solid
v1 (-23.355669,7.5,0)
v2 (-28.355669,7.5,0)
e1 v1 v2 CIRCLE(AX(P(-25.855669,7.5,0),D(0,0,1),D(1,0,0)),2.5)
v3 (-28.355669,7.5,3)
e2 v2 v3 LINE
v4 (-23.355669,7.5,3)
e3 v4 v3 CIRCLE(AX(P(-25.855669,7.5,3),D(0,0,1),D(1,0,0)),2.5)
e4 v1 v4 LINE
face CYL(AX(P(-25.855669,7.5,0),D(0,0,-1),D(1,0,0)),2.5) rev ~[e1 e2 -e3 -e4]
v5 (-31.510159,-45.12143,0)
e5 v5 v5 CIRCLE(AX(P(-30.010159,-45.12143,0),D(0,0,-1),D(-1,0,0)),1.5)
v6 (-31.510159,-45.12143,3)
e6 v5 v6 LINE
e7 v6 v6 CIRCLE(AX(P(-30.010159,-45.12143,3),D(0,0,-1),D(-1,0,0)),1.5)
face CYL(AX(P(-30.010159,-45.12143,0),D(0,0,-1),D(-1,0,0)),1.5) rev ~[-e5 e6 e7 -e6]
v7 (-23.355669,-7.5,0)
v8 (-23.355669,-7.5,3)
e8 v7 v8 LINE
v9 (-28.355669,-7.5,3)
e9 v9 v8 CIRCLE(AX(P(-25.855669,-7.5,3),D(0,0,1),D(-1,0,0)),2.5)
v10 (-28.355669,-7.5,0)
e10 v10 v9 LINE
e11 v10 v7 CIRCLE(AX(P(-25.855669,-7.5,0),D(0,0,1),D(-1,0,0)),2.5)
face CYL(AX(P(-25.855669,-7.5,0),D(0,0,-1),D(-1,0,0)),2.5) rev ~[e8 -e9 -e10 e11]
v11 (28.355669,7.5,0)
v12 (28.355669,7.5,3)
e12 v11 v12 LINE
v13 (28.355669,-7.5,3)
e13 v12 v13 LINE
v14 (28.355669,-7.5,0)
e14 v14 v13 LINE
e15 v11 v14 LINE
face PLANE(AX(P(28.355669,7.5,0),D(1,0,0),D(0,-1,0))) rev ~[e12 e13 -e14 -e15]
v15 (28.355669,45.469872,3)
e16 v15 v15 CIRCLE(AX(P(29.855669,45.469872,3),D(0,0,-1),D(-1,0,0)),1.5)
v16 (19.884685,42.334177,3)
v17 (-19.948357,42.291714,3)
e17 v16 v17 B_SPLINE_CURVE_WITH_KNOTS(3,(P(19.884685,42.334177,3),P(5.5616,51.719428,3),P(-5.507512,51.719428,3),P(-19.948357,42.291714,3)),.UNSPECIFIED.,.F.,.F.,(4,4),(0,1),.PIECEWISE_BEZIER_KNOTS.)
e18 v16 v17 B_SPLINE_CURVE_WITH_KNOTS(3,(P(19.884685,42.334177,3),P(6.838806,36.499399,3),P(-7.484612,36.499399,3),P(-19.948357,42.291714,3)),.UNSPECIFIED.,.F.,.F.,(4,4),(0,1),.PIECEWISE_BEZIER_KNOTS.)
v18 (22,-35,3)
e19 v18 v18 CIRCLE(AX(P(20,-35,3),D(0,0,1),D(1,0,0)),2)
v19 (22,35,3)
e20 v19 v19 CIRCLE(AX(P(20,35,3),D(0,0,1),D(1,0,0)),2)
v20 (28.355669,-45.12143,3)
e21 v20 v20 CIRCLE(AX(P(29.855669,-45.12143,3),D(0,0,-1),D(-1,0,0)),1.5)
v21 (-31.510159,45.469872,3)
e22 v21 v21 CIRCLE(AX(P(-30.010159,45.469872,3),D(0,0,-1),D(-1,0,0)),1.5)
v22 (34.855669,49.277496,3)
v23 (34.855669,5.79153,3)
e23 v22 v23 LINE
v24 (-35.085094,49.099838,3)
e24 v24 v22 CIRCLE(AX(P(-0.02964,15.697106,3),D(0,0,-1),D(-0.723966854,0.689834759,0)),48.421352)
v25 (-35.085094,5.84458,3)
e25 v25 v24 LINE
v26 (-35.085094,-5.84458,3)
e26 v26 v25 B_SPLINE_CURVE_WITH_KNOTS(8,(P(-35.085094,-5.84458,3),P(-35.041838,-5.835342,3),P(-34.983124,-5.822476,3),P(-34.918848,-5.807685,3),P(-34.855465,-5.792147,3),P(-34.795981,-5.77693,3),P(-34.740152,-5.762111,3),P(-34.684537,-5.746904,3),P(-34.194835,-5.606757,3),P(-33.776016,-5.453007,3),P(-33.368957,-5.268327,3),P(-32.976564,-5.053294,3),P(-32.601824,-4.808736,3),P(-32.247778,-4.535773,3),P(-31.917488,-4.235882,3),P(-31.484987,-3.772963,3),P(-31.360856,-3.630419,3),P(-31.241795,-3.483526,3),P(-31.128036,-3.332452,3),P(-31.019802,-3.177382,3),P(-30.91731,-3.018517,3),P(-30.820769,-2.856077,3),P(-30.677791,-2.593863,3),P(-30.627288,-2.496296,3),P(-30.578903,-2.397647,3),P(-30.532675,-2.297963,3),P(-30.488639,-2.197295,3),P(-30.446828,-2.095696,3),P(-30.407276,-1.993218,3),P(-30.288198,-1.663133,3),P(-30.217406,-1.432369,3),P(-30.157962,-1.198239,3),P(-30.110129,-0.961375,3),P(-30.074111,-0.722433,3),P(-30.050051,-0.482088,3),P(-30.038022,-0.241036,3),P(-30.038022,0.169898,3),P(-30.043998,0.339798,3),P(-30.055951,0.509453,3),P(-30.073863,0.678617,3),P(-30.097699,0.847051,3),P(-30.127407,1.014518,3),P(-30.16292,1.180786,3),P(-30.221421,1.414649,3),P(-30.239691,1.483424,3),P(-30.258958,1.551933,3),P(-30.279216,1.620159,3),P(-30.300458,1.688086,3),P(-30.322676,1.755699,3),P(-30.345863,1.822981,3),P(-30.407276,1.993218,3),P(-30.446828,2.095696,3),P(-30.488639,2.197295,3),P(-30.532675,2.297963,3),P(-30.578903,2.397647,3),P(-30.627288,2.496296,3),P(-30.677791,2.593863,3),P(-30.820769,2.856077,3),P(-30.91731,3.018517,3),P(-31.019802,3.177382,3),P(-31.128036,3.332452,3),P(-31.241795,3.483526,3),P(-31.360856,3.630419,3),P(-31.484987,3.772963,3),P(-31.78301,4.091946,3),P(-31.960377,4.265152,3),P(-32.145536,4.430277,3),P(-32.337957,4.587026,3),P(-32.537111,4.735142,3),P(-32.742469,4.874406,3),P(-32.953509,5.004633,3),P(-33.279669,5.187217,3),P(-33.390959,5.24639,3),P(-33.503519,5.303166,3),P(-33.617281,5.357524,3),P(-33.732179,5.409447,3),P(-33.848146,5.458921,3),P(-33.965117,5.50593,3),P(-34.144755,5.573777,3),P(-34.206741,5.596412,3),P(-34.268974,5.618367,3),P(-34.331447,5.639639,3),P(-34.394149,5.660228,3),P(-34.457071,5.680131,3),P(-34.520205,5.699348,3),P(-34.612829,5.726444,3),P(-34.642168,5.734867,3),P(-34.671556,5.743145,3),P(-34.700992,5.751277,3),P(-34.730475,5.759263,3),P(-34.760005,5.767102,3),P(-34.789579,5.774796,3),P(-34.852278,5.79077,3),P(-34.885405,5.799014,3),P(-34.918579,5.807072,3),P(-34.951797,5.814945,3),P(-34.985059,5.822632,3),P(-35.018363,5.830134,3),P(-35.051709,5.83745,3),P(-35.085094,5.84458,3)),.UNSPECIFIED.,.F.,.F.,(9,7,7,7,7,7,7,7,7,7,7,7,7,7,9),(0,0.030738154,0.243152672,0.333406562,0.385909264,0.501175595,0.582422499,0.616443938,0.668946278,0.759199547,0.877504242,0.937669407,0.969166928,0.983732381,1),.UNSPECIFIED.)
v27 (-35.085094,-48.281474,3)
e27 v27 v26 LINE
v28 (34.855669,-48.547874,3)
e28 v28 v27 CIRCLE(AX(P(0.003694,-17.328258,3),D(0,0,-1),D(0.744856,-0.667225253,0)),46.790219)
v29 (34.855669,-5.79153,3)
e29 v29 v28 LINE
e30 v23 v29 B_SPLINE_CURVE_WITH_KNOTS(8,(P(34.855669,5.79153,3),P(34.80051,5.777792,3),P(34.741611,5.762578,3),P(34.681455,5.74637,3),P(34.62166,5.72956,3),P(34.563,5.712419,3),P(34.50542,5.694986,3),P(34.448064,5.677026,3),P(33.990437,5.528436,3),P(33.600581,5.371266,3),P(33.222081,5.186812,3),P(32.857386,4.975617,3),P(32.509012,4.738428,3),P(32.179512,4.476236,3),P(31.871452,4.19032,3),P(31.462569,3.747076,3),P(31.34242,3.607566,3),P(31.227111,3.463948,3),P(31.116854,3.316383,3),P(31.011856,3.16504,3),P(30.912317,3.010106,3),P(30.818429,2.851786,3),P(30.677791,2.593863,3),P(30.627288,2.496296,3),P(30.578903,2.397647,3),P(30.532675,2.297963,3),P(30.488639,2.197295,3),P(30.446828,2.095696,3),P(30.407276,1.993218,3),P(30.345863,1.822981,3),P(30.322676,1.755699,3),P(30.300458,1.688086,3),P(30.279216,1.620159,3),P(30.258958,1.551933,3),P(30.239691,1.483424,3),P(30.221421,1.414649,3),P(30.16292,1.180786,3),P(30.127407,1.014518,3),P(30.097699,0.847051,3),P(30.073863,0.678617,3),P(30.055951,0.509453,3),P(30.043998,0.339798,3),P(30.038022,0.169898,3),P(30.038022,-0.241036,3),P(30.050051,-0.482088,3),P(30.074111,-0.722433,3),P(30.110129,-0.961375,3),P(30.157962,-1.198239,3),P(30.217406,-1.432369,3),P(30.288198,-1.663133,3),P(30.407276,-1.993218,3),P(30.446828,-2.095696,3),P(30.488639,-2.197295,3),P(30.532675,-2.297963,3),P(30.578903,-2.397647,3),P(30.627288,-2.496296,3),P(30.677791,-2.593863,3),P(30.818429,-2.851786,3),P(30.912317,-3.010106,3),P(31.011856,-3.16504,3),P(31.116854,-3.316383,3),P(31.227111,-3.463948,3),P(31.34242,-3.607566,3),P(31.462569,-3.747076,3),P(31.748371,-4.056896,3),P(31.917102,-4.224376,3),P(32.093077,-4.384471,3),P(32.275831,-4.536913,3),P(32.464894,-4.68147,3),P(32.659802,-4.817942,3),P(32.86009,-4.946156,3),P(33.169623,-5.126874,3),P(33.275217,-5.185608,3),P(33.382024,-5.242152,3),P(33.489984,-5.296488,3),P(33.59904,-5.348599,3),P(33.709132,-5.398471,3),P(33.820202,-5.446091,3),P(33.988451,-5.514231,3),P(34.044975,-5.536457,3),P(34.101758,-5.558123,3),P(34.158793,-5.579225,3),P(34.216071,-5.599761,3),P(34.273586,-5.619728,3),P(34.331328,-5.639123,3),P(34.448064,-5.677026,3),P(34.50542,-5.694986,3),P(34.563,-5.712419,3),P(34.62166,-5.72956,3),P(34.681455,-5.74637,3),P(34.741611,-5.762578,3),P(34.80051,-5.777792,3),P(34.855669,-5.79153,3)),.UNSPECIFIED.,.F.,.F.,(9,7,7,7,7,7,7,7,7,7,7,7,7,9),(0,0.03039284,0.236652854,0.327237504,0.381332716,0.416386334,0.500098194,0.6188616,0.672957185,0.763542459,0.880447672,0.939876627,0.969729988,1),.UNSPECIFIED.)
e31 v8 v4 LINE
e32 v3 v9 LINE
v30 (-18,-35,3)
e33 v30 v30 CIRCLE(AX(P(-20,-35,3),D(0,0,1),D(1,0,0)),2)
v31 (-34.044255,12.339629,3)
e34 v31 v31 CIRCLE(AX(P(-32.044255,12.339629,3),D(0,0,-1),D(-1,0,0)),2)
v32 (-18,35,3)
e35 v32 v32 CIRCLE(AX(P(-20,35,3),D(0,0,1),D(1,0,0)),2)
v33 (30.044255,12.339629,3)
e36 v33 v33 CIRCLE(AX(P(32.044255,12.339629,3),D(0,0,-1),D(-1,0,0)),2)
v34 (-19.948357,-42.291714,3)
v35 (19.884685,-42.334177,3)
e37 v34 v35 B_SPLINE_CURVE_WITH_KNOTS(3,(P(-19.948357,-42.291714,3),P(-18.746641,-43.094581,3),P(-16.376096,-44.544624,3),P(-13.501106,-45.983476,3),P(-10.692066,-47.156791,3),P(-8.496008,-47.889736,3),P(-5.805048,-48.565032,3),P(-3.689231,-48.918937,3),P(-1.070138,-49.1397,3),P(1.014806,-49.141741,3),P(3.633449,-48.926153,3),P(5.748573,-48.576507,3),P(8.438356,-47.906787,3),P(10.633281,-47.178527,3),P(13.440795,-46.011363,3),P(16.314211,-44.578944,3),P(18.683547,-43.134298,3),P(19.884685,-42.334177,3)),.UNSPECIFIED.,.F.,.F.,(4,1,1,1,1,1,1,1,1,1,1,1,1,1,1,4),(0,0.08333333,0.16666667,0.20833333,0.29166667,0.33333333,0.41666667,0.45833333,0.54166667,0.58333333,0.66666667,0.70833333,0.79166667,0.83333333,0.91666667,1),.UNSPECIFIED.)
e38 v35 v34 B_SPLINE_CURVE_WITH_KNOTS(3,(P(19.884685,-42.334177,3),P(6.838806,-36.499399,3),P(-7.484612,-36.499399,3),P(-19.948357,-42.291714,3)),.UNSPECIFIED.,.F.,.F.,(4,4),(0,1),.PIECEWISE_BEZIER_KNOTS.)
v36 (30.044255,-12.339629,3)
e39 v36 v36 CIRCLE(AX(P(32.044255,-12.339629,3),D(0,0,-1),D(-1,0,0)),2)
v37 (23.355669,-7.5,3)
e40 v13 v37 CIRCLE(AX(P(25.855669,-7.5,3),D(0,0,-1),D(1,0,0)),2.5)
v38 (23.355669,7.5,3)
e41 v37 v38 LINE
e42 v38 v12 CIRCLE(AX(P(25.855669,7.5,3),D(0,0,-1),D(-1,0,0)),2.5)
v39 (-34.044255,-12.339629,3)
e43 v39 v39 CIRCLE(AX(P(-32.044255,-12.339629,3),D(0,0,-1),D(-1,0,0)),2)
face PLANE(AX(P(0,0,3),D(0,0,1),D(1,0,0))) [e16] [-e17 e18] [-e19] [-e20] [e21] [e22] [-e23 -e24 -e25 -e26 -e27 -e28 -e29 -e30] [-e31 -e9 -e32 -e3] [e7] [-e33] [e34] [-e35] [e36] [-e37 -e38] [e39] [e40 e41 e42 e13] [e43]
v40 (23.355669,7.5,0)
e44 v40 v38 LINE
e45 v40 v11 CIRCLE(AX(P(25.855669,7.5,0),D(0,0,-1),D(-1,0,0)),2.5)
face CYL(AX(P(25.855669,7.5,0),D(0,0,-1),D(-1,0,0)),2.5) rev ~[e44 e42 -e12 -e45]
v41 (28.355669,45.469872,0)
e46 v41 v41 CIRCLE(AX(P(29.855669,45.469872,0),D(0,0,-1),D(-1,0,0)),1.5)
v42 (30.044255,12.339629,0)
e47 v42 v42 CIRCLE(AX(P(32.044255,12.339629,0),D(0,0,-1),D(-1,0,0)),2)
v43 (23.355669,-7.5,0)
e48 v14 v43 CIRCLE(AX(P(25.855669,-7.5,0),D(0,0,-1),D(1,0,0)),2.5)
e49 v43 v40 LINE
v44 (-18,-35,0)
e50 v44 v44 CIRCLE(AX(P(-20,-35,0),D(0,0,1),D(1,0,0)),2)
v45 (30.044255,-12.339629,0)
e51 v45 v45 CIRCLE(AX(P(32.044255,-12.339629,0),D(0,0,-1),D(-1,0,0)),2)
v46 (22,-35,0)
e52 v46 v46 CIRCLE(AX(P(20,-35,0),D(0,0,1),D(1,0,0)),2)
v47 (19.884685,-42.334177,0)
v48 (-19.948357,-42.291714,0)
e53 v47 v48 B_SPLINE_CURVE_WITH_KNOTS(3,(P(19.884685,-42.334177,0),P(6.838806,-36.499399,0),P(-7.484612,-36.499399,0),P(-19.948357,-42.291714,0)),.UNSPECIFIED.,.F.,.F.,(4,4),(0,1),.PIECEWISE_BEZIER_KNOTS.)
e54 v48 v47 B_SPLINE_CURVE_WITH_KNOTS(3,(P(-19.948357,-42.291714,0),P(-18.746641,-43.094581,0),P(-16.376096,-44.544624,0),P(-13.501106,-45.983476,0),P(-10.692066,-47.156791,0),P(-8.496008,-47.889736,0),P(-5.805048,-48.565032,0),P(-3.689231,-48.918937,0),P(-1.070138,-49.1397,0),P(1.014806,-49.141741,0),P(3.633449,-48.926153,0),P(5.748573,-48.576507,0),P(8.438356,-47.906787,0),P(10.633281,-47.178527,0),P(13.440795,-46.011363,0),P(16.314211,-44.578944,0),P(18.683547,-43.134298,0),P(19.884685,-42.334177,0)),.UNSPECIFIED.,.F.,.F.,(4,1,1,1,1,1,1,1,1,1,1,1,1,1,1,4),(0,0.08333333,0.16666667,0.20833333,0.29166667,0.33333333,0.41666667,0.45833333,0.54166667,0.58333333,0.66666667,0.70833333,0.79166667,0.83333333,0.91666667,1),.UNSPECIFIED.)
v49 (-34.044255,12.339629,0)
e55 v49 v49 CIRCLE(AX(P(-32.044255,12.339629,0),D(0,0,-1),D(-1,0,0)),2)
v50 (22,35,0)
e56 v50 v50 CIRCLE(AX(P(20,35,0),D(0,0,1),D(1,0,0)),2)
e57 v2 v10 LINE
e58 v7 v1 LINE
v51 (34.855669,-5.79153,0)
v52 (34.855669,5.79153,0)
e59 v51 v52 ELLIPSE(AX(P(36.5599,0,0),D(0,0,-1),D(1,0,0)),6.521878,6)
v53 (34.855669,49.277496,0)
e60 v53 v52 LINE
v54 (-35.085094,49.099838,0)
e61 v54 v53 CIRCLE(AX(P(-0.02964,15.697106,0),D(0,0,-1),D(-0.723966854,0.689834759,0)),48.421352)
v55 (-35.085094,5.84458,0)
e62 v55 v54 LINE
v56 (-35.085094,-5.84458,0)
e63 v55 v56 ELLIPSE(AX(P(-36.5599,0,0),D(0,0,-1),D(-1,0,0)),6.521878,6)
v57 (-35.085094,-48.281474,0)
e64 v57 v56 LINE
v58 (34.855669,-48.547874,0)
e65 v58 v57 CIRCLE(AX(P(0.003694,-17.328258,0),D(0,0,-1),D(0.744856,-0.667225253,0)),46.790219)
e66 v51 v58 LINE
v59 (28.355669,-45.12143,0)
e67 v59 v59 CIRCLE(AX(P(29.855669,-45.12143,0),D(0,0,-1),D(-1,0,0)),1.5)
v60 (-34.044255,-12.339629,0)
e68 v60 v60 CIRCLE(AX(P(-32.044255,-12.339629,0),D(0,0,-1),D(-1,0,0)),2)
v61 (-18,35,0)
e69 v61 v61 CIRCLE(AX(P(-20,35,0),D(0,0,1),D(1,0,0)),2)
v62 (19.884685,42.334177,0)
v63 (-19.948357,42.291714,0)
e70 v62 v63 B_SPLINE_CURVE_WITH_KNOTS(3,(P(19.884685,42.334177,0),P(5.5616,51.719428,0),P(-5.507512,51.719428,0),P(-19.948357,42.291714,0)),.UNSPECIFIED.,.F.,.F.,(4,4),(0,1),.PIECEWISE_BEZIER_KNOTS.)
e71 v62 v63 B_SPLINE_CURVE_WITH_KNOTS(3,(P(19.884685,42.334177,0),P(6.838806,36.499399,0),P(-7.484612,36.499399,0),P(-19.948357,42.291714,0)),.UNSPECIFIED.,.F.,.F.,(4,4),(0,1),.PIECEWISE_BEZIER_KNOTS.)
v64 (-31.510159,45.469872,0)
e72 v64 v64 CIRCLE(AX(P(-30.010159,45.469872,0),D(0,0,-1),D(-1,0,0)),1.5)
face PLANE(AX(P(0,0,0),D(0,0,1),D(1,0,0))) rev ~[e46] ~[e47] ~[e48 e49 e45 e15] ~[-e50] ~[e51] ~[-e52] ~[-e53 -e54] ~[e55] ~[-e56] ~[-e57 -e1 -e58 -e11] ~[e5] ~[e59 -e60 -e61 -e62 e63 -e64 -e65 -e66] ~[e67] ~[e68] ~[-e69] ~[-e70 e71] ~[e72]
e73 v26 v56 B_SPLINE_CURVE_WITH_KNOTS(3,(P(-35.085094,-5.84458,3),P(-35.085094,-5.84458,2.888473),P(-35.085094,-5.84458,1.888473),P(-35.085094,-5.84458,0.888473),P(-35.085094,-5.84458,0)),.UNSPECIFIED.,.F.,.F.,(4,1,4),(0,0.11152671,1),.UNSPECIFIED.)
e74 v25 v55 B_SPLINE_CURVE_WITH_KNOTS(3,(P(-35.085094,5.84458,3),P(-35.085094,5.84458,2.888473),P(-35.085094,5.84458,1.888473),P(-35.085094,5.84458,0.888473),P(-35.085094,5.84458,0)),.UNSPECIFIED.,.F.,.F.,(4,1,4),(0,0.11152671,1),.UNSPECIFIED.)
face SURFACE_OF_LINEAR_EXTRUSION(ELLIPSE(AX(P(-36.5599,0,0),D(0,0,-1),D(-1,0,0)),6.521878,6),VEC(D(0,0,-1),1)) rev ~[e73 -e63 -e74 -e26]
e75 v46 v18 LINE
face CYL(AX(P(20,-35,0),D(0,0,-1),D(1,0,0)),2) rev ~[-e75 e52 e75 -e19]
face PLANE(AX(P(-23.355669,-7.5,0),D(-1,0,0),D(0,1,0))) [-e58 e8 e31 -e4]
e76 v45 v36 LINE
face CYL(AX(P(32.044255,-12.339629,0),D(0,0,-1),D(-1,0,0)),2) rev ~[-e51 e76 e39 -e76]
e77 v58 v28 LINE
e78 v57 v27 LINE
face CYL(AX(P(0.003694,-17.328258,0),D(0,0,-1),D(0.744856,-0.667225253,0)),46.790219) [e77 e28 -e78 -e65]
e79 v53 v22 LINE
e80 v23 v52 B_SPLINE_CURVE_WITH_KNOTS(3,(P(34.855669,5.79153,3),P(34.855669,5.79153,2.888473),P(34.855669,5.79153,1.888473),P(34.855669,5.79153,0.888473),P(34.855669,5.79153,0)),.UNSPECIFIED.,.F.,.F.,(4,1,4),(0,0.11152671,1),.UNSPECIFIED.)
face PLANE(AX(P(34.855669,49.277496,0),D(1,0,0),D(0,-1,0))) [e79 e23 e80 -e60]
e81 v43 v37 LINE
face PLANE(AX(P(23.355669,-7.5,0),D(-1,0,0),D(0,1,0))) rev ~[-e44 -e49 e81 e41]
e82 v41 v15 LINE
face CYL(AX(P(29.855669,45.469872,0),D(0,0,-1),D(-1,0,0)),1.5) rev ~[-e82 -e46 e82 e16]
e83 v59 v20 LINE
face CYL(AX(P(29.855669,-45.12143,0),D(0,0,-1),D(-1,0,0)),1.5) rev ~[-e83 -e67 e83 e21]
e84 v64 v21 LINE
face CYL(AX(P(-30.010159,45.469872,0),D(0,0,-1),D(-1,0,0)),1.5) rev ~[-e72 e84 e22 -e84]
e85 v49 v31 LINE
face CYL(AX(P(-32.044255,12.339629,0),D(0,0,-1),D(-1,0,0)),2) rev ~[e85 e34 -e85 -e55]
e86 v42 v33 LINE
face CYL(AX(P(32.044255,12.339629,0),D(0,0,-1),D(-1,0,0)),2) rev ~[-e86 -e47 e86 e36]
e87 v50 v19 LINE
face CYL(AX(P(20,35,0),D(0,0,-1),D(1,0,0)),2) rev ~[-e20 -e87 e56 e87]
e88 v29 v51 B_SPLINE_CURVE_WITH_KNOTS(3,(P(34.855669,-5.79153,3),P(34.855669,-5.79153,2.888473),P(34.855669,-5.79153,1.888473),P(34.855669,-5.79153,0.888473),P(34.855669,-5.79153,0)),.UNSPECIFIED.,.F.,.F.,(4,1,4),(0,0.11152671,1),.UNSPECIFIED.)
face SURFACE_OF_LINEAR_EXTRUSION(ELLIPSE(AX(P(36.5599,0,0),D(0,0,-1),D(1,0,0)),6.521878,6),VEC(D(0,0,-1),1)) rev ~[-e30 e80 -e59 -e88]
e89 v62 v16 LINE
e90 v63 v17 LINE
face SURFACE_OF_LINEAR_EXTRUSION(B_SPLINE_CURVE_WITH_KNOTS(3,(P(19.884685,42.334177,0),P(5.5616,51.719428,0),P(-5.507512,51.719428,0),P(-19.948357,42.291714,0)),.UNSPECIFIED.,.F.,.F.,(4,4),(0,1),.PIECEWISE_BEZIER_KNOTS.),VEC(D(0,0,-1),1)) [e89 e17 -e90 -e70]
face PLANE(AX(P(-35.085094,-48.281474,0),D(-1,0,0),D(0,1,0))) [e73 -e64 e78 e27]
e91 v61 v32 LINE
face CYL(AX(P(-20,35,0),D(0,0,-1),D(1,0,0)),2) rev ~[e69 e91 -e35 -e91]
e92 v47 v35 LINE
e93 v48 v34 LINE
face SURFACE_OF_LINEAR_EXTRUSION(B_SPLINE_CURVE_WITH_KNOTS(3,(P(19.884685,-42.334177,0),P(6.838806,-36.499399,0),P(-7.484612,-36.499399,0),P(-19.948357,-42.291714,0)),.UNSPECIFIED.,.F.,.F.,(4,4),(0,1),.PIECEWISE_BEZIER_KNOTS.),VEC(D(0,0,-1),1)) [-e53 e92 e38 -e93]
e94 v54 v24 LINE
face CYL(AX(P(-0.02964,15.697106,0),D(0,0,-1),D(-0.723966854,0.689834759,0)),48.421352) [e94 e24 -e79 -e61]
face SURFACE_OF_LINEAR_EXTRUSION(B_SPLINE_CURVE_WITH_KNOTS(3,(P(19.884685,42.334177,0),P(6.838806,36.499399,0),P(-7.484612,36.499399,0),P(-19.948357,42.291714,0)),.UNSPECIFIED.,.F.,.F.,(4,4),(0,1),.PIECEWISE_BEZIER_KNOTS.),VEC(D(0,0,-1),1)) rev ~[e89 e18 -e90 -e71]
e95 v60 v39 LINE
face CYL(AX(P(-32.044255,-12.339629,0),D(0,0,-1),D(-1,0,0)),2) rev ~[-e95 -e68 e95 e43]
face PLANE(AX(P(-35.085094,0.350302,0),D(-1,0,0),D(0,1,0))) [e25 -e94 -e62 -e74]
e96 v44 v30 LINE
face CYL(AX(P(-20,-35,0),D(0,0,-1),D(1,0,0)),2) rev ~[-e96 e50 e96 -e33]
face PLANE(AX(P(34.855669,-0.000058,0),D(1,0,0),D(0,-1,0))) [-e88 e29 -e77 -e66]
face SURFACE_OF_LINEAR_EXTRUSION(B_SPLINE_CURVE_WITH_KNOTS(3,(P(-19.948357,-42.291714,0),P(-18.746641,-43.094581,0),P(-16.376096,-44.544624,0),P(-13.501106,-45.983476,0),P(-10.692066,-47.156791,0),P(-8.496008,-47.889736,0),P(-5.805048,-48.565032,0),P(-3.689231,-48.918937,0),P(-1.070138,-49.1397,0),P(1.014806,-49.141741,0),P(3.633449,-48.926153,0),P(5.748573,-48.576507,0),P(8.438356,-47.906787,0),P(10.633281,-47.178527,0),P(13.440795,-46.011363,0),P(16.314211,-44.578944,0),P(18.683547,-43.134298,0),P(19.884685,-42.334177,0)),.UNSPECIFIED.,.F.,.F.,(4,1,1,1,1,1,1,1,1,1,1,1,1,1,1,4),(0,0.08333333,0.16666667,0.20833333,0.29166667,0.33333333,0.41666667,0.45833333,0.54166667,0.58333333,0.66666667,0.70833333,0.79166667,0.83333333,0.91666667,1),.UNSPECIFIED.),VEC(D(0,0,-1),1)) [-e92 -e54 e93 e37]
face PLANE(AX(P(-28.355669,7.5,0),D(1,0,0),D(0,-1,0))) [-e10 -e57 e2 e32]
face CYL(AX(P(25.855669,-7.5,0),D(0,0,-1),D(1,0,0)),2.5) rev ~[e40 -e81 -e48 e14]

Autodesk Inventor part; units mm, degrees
ref_plane "YZ Plane" through (0, 0, 0) normal (1, 0, 0) x (0, 1, 0)
ref_plane "XZ Plane" through (0, 0, 0) normal (0, 1, 0) x (-1, 0, 0)
ref_plane "XY Plane" through (0, 0, 0) normal (0, 0, 1) x (1, 0, 0)
ref_plane "Płaszczyzna konstrukcyjna1" through (0, 0, 0) normal (0, 0, 1) x (1, 0, 0)
sketch "Szkic1" plane through (0, 0, 0) normal (0, 0, 1) x (1, 0, 0)
  line L0 (-16.5, -47.5) -> (-16.5, 50.5) construction
  line L1 (16.5, -47.5) -> (-16.5, -47.5)
  line L2 (16.5, 50.5) -> (16.5, -47.5) construction
  line L3 (-16.5, 50.5) -> (16.5, 50.5)
  spline S0 degree 3 poles (-35.085094, 0.350302) (-65.123445, -45.85666) (-107.677174, -89.186977) (-160.871239, -134.245964) (-163.540213, -136.506767) (-166.235706, -138.77176) (-168.958028, -141.042) knots 1.00684263 1.00684263 1.00684263 1.00684263 1.95254981 1.95254981 1.95254981 2 2 2 2 construction
  spline S1 degree 3 poles (-168.958035, -141.042006) (-174.842969, -145.949681) (-180.021392, -152.120463) (-183.430993, -158.400223) (-185.92467, -162.993046) (-187.5096, -167.629248) (-187.777285, -172.0593) (-187.941661, -174.779633) (-187.597345, -177.457906) (-186.533873, -179.887417) (-185.566044, -182.098431) (-183.960403, -184.06029) (-181.944828, -185.409391) (-179.841126, -186.817479) (-177.370046, -187.557326) (-174.842104, -187.757319) (-170.645821, -188.089298) (-166.2165, -187.039461) (-161.759498, -185.081578) (-154.903003, -182.06964) (-147.956172, -176.775816) (-142.375954, -170.505914) (-141.930799, -170.005741) (-141.494091, -169.499252) (-141.067481, -168.988346) knots -1.74995257 -1.74995257 -1.74995257 -1.74995257 -1.03595782 -1.03595782 -1.03595782 -0.51376401 -0.51376401 -0.51376401 -0.19310387 -0.19310387 -0.19310387 0.09871784 0.09871784 0.09871784 0.4032988 0.4032988 0.4032988 0.90889088 0.90889088 0.90889088 1.68667586 1.68667586 1.68667586 1.74872267 1.74872267 1.74872267 1.74872267
  spline S2 degree 3 poles (-141.067481, -168.988346) (-116.712468, -140.68912) (-93.293894, -114.867026) (-73.367362, -94.342192) (-61.6586, -82.28187) (-51.151132, -72.048223) (-42.412496, -64.246161) (-37.627468, -59.973975) (-33.366948, -56.428021) (-29.779492, -53.735847) knots 1.1712815 1.1712815 1.1712815 1.1712815 1.58557053 1.58557053 1.58557053 1.82900535 1.82900535 1.82900535 1.96230333 1.96230333 1.96230333 1.96230333
  spline S3 degree 3 poles (-29.779492, -53.735847) (-23.002213, -58.511561) (-16.053637, -61.720133) (-8.95639, -63.196051) (-1.235829, -64.801593) (6.619932, -64.303417) (14.26492, -61.76241) (19.532027, -60.011752) (24.701042, -57.314346) (29.778619, -53.736463) knots 1.04774904 1.04774904 1.04774904 1.04774904 1.36653444 1.36653444 1.36653444 1.71331713 1.71331713 1.71331713 1.95223726 1.95223726 1.95223726 1.95223726
  spline S4 degree 3 poles (29.778619, -53.736463) (34.571432, -57.320947) (40.566429, -62.365096) (47.432495, -68.614281) (65.987099, -85.501849) (90.98262, -111.228833) (117.881656, -141.881406) (125.48107, -150.541255) (133.234406, -159.595591) (141.042009, -168.957931) knots 1.23044004 1.23044004 1.23044004 1.23044004 1.40276207 1.40276207 1.40276207 1.86843878 1.86843878 1.86843878 2 2 2 2
  spline S5 degree 3 poles (141.042009, -168.957931) (145.94969, -174.842884) (152.120487, -180.021325) (158.400263, -183.430935) (162.993086, -185.924612) (167.629288, -187.509541) (172.05934, -187.777227) (174.779673, -187.941603) (177.457946, -187.597287) (179.887458, -186.533815) (182.098472, -185.565985) (184.06033, -183.960345) (185.409431, -181.94477) (186.817519, -179.841068) (187.557366, -177.369988) (187.757359, -174.842045) (188.089339, -170.645763) (187.039501, -166.216442) (185.081618, -161.75944) (182.069681, -154.902945) (176.775856, -147.956114) (170.505954, -142.375896) (169.995852, -141.921904) (169.479183, -141.4767) (168.957931, -141.042009) knots -1.7499544 -1.7499544 -1.7499544 -1.7499544 -1.03595782 -1.03595782 -1.03595782 -0.51376401 -0.51376401 -0.51376401 -0.19310387 -0.19310387 -0.19310387 0.09871784 0.09871784 0.09871784 0.4032988 0.4032988 0.4032988 0.90889088 0.90889088 0.90889088 1.68667586 1.68667586 1.68667586 1.7499544 1.7499544 1.7499544 1.7499544
  spline S6 degree 3 poles (168.957931, -141.042009) (111.993228, -93.537028) (66.637529, -48.185561) (34.855669, -0.000058) knots 1 1 1 1 1.99296801 1.99296801 1.99296801 1.99296801 construction
  spline S7 degree 3 poles (34.855669, -0.000058) (66.637377, 48.185408) (111.993133, 93.536948) (168.957931, 141.042009) knots 1.00703033 1.00703033 1.00703033 1.00703033 2 2 2 2 construction
  spline S8 degree 3 poles (168.957931, 141.042009) (174.842884, 145.94969) (180.021325, 152.120487) (183.430935, 158.400263) (185.924612, 162.993086) (187.509541, 167.629288) (187.777227, 172.05934) (187.941603, 174.779673) (187.597287, 177.457946) (186.533815, 179.887458) (185.565985, 182.098472) (183.960345, 184.06033) (181.94477, 185.409431) (179.841068, 186.817519) (177.369988, 187.557366) (174.842045, 187.757359) (170.645763, 188.089339) (166.216442, 187.039501) (161.75944, 185.081618) (154.902945, 182.069681) (147.956114, 176.775856) (142.375896, 170.505954) (141.93073, 170.005769) (141.494012, 169.499268) (141.067392, 168.98835) knots -1.7499544 -1.7499544 -1.7499544 -1.7499544 -1.03595782 -1.03595782 -1.03595782 -0.51376401 -0.51376401 -0.51376401 -0.19310387 -0.19310387 -0.19310387 0.09871784 0.09871784 0.09871784 0.4032988 0.4032988 0.4032988 0.90889088 0.90889088 0.90889088 1.68667586 1.68667586 1.68667586 1.74872416 1.74872416 1.74872416 1.74872416 construction
  spline S9 degree 3 poles (141.067392, 168.98835) (116.712447, 140.689096) (93.29391, 114.86699) (73.367396, 94.342151) (61.658634, 82.281814) (51.151162, 72.048159) (42.412523, 64.246094) (37.627506, 59.973916) (33.366993, 56.427969) (29.779541, 53.7358) knots 1.17128149 1.17128149 1.17128149 1.17128149 1.58557053 1.58557053 1.58557053 1.82900558 1.82900558 1.82900558 1.96230334 1.96230334 1.96230334 1.96230334 construction
  spline S10 degree 3 poles (29.779541, 53.7358) (23.00225, 58.511525) (16.053664, 61.720107) (8.956408, 63.196032) (1.235842, 64.80158) (-6.619923, 64.30341) (-14.264913, 61.762407) (-19.532023, 60.011751) (-24.70104, 57.314346) (-29.778619, 53.736463) knots 1.04774897 1.04774897 1.04774897 1.04774897 1.36653452 1.36653452 1.36653452 1.71331713 1.71331713 1.71331713 1.95223726 1.95223726 1.95223726 1.95223726
  spline S11 degree 3 poles (-29.778619, 53.736463) (-34.571432, 57.320947) (-40.566429, 62.365096) (-47.432495, 68.614281) (-65.987099, 85.501849) (-90.98262, 111.228833) (-117.881656, 141.881406) (-125.48107, 150.541255) (-133.234406, 159.595591) (-141.042009, 168.957931) knots 1.23044004 1.23044004 1.23044004 1.23044004 1.40276207 1.40276207 1.40276207 1.86843878 1.86843878 1.86843878 2 2 2 2 construction
  spline S12 degree 3 poles (-141.042009, 168.957931) (-145.94969, 174.842884) (-152.120487, 180.021325) (-158.400263, 183.430935) (-162.993086, 185.924612) (-167.629288, 187.509541) (-172.05934, 187.777227) (-174.779673, 187.941603) (-177.457946, 187.597287) (-179.887458, 186.533815) (-182.098472, 185.565985) (-184.06033, 183.960345) (-185.409431, 181.94477) (-186.817519, 179.841068) (-187.557366, 177.369988) (-187.757359, 174.842045) (-188.089339, 170.645763) (-187.039501, 166.216442) (-185.081618, 161.75944) (-182.069681, 154.902945) (-176.775856, 147.956114) (-170.505954, 142.375896) (-169.995852, 141.921904) (-169.479183, 141.4767) (-168.957931, 141.042009) knots -1.7499544 -1.7499544 -1.7499544 -1.7499544 -1.03595782 -1.03595782 -1.03595782 -0.51376401 -0.51376401 -0.51376401 -0.19310387 -0.19310387 -0.19310387 0.09871784 0.09871784 0.09871784 0.4032988 0.4032988 0.4032988 0.90889088 0.90889088 0.90889088 1.68667586 1.68667586 1.68667586 1.7499544 1.7499544 1.7499544 1.7499544
  spline S13 degree 3 poles (-168.957931, 141.042009) (-111.993306, 93.537093) (-66.634651, 48.181164) (-35.085094, 0.350302) knots 1 1 1 1 1.99296665 1.99296665 1.99296665 1.99296665 construction
  spline S14 degree 3 poles (15.08474, 32.081826) (13.142615, 27.920021) (11.206834, 23.755267) (7.347081, 15.418016) (5.423125, 11.245533) (3.50551, 7.070128) knots 0 0 0 0 1.37779618 1.37779618 2.75620579 2.75620579 2.75620579 2.75620579 construction
  arc A0 (3.50551, 7.070128) -> (-3.550162, 7.111441) centre (-0.064535, -0.117868) ccw
  spline S15 degree 3 poles (-3.550162, 7.111441) (-5.476159, 11.293082) (-7.408923, 15.471593) (-11.287085, 23.820373) (-13.232467, 27.990624) (-15.184617, 32.157717) knots 0 0 0 0 1.38115979 1.38115979 2.76166682 2.76166682 2.76166682 2.76166682 construction
  spline S16 degree 3 poles (-15.184617, 32.157717) (-14.754715, 32.524347) (-14.315487, 32.879522) (-13.401907, 33.58056) (-12.927392, 33.92514) (-12.444135, 34.257559) knots 0 0 0 0 0.49064646 0.49064646 1 1 1 1
  spline S17 degree 3 poles (-12.444135, 34.257559) (-9.857516, 31.263166) (-7.370332, 28.095019) (-3.226905, 21.915373) (-1.464317, 18.86972) (-0.029639, 15.697104) knots 0 0 0 0 1.18706736 1.18706736 2.2295227 2.2295227 2.2295227 2.2295227
  spline S18 degree 3 poles (-0.029639, 15.697104) (1.394779, 18.864276) (3.146428, 21.904712) (7.267313, 28.073431) (9.741557, 31.234617) (12.316482, 34.222704) knots 0 0 0 0 1.04182291 1.04182291 2.22753004 2.22753004 2.22753004 2.22753004
  spline S19 degree 3 poles (12.316482, 34.222704) (12.805198, 33.884055) (13.28481, 33.532857) (14.207654, 32.81808) (14.651041, 32.455846) (15.08474, 32.081826) knots 0 0 0 0 0.50937249 0.50937249 1 1 1 1
  spline S20 degree 3 poles (-19.948357, 42.291714) (-14.639949, 45.838264) (-9.990985, 47.660697) (-2.091787, 49.301941) (1.677222, 49.331262) (9.761575, 47.76592) (14.518581, 45.908732) (19.884685, 42.334177) knots 0 0 0 0 1.91524131 1.91524131 3.69438874 3.69438874 5.68840016 5.68840016 5.68840016 5.68840016 construction
  spline S21 degree 3 poles (19.884685, 42.334177) (13.583668, 39.654933) (6.996486, 38.105537) (-3.242366, 38.040322) (-6.597665, 38.388751) (-13.364764, 39.812974) (-16.709843, 40.903142) (-19.948357, 42.291714) knots 0 0 0 0 2.05409443 2.05409443 3.07151826 3.07151826 4.128565 4.128565 4.128565 4.128565
  circle A1 centre (-173.423564, 173.187828) radius 3
  circle A2 centre (173.294495, -173.423564) radius 3
  circle A3 centre (173.241161, 173.241161) radius 3
  circle A4 centre (-173.370231, -173.476898) radius 3
  spline S22 degree 3 poles (-19.066093, -42.869125) (-12.882074, -40.751924) (-6.517551, -39.59928) (6.547635, -39.59651) (12.903023, -40.74369) (19.078711, -42.861037) knots 0 0 0 0 1.96092247 1.96092247 3.91949067 3.91949067 3.91949067 3.91949067 construction
  spline S23 degree 3 poles (19.078711, -42.861037) (14.864666, -45.563042) (10.225957, -47.709734) (1.45827, -49.346262) (-2.32179, -49.284891) (-9.747617, -47.680221) (-14.038512, -46.090792) (-19.066093, -42.869125) knots 0 0 0 0 1.5017693 1.5017693 2.66720704 2.66720704 3.77054668 3.77054668 3.77054668 3.77054668
  spline S24 degree 3 poles (-14.516561, -32.673383) (-12.636802, -28.474571) (-10.750685, -24.278615) (-6.966619, -15.894413) (-5.068682, -11.706181) (-3.164387, -7.520833) knots 0 0 0 0 1.38011477 1.38011477 2.75957612 2.75957612 2.75957612 2.75957612 construction
  arc A5 (-3.164387, -7.520833) -> (3.168342, -7.463715) centre (-0.064535, -0.117868) ccw
  spline S25 degree 3 poles (3.168342, -7.463715) (5.085541, -11.667908) (6.995965, -15.875184) (10.800733, -24.290442) (12.69509, -28.498407) (14.582623, -32.709436) knots 0 0 0 0 1.38621048 1.38621048 2.77062343 2.77062343 2.77062343 2.77062343 construction
  spline S26 degree 3 poles (14.582623, -32.709436) (14.13991, -33.096217) (13.662069, -33.486083) (12.716313, -34.222379) (12.21496, -34.593642) (11.712763, -34.945387) knots 0 0 0 0 0.49185835 0.49185835 1 1 1 1
  spline S27 degree 3 poles (11.712763, -34.945387) (9.276978, -32.103289) (6.942538, -29.102251) (3.034739, -23.232824) (1.370156, -20.340004) (0.003694, -17.328259) knots 0 0 0 0 1.12292095 1.12292095 2.11343337 2.11343337 2.11343337 2.11343337 construction
  spline S28 degree 3 poles (0.003694, -17.328259) (-1.356274, -20.333171) (-3.013893, -23.219487) (-6.906842, -29.076217) (-9.233125, -32.070858) (-11.66075, -34.906916) knots 0 0 0 0 0.98950049 0.98950049 2.1113335 2.1113335 2.1113335 2.1113335
  spline S29 degree 3 poles (-11.66075, -34.906916) (-12.164863, -34.554062) (-12.659287, -34.188046) (-13.611319, -33.442296) (-14.069007, -33.063947) (-14.516561, -32.673383) knots 0 0 0 0 0.50881737 0.50881737 1 1 1 1
  line L4 (-35.085094, 0.350302) -> (-35.085094, 49.099838)
  line L5 (-35.085094, 0.350302) -> (-35.085094, -48.281474)
  line L6 (34.855669, -0.000058) -> (34.855669, -48.547874)
  line L7 (34.855669, -0.000058) -> (34.855669, 49.277496)
  arc A6 (34.855669, 49.277496) -> (-35.085094, 49.099838) centre (-0.029639, 15.697104) ccw
  arc A7 (-35.085094, -48.281474) -> (34.855669, -48.547874) centre (0.003694, -17.328259) ccw
  circle A8 centre (-20, -35) radius 2
  line L8 (-277.818739, 0) -> (277.818714, 0)
  line L9 (0, -277.778257) -> (0, 277.778257)
  circle A9 centre (20, -35) radius 2
  circle A10 centre (-20, 35) radius 2
  circle A11 centre (20, 35) radius 2
  arc A12 (28.355669, 7.5) -> (23.355669, 7.5) centre (25.855669, 7.5) ccw
  arc A13 (23.355669, -7.5) -> (28.355669, -7.5) centre (25.855669, -7.5) ccw
  line L10 (28.355669, -7.5) -> (28.355669, 7.5)
  line L11 (23.355669, 7.5) -> (23.355669, -7.5)
  arc A14 (-23.355669, 7.5) -> (-28.355669, 7.5) centre (-25.855669, 7.5) ccw
  arc A15 (-28.355669, -7.5) -> (-23.355669, -7.5) centre (-25.855669, -7.5) ccw
  line L12 (-28.355669, -7.5) -> (-28.355669, 7.5)
  line L13 (-23.355669, 7.5) -> (-23.355669, -7.5)
  line L14 (19.884685, 42.334177) -> (5.5616, 51.719428) construction
  line L15 (5.5616, 51.719428) -> (-5.507512, 51.719428) construction
  line L16 (-5.507512, 51.719428) -> (-19.948357, 42.291714) construction
  spline S30 degree 3 poles (19.884685, 42.334177) (5.5616, 51.719428) (-5.507512, 51.719428) (-19.948357, 42.291714) knots 1 1 1 1 2 2 2 2
  line L17 (19.884685, 42.334177) -> (6.838806, 36.499399) construction
  line L18 (6.838806, 36.499399) -> (-7.484612, 36.499399) construction
  line L19 (-7.484612, 36.499399) -> (-19.948357, 42.291714) construction
  spline S31 degree 3 poles (19.884685, 42.334177) (6.838806, 36.499399) (-7.484612, 36.499399) (-19.948357, 42.291714) knots 1 1 1 1 2 2 2 2
  spline S32 degree 3 poles (-19.948357, -42.291714) (-18.746641, -43.094581) (-16.376096, -44.544624) (-13.501106, -45.983476) (-10.692066, -47.156791) (-8.496008, -47.889736) (-5.805048, -48.565032) (-3.689231, -48.918937) (-1.070138, -49.1397) (1.014806, -49.141741) (3.633449, -48.926153) (5.748573, -48.576507) (8.438356, -47.906787) (10.633281, -47.178527) (13.440795, -46.011363) (16.314211, -44.578944) (18.683547, -43.134298) (19.884685, -42.334177) knots 1.0724773 1.0724773 1.0724773 1.0724773 1.1438362 1.2151951 1.25087454 1.32223344 1.35791289 1.42927178 1.46495123 1.53631013 1.57198957 1.64334847 1.67902792 1.75038681 1.78606626 1.85742515 1.92878405 1.92878405 1.92878405 1.92878405
  line L20 (19.884685, -42.334177) -> (6.838806, -36.499399) construction
  line L21 (6.838806, -36.499399) -> (-7.484612, -36.499399) construction
  line L22 (-7.484612, -36.499399) -> (-19.948357, -42.291714) construction
  spline S33 degree 3 poles (19.884685, -42.334177) (6.838806, -36.499399) (-7.484612, -36.499399) (-19.948357, -42.291714) knots 1 1 1 1 2 2 2 2
  point P0 (0, 0)
  dimension "d0" = 4
  dimension "d3" = 3.5
  dimension "d4" = 12.5
  dimension "d5" = 5
  dimension "d6" = 9
  dimension "d7" = 7.5
sketch "Szkic1 outline for Wyciągnięcie proste1" plane through (0, 0, 0) normal (0, 0, 1) x (1, 0, 0)
  line L0 (-35.085094, 0.350302) -> (-35.085094, 49.099838)
  line L1 (-35.085094, -48.281474) -> (-35.085094, 0.350302)
  arc A0 (-35.085094, 49.099838) -> (34.855669, 49.277496) centre (-0.029639, 15.697104) cw
  arc A1 (34.855669, -48.547874) -> (-35.085094, -48.281474) centre (0.003694, -17.328259) cw
  line L2 (34.855669, 49.277496) -> (34.855669, -0.000058)
  line L3 (34.855669, -0.000058) -> (34.855669, -48.547874)
  circle A2 centre (-20, -35) radius 2
  spline S0 degree 3 poles (19.884685, -42.334177) (6.838806, -36.499399) (-7.484612, -36.499399) (-19.948357, -42.291714) knots 0 0 0 0 1 1 1 1
  spline S1 degree 3 poles (-19.948357, -42.291714) (-18.746641, -43.094581) (-16.376096, -44.544624) (-13.501106, -45.983476) (-10.692066, -47.156791) (-8.496008, -47.889736) (-5.805048, -48.565032) (-3.689231, -48.918937) (-1.070138, -49.1397) (1.014806, -49.141741) (3.633449, -48.926153) (5.748573, -48.576507) (8.438356, -47.906787) (10.633281, -47.178527) (13.440795, -46.011363) (16.314211, -44.578944) (18.683547, -43.134298) (19.884685, -42.334177) knots 0 0 0 0 0.08333333 0.16666667 0.20833333 0.29166667 0.33333333 0.41666667 0.45833333 0.54166667 0.58333333 0.66666667 0.70833333 0.79166667 0.83333333 0.91666667 1 1 1 1
  line L4 (-28.355669, 7.5) -> (-28.355669, -7.5)
  arc A3 (-28.355669, -7.5) -> (-23.355669, -7.5) centre (-25.855669, -7.5) ccw
  line L5 (-23.355669, -7.5) -> (-23.355669, 7.5)
  arc A4 (-23.355669, 7.5) -> (-28.355669, 7.5) centre (-25.855669, 7.5) ccw
  circle A5 centre (20, -35) radius 2
  line L6 (28.355669, 7.5) -> (28.355669, -7.5)
  arc A6 (23.355669, 7.5) -> (28.355669, 7.5) centre (25.855669, 7.5) cw
  line L7 (23.355669, -7.5) -> (23.355669, 7.5)
  arc A7 (28.355669, -7.5) -> (23.355669, -7.5) centre (25.855669, -7.5) cw
  circle A8 centre (-20, 35) radius 2
  spline S2 degree 3 poles (19.884685, 42.334177) (5.5616, 51.719428) (-5.507512, 51.719428) (-19.948357, 42.291714) knots 0 0 0 0 1 1 1 1
  spline S3 degree 3 poles (19.884685, 42.334177) (6.838806, 36.499399) (-7.484612, 36.499399) (-19.948357, 42.291714) knots 0 0 0 0 1 1 1 1
  circle A9 centre (20, 35) radius 2
extrude "Wyciągnięcie proste1" add sketch "Szkic1 outline for Wyciągnięcie proste1" along normal blind 3
sketch "Szkic2" plane through (0, 0, 0) normal (0, 0, -1) x (-1, 0, 0)
  ellipse E0 centre (-36.5599, 0) end of major axis (-43.081778, 0) minor radius 6
  circle A0 centre (-32.044255, 12.339629) radius 2
  circle A1 centre (-32.044255, -12.339629) radius 2
  ellipse E1 centre (36.5599, 0) end of major axis (43.081778, 0) minor radius 6
  circle A2 centre (32.044255, 12.339629) radius 2
  circle A3 centre (32.044255, -12.339629) radius 2
  point P0 (0, 0)
extrude "Wyciągnięcie proste2" cut sketch "Szkic2" against normal through all
sketch "Szkic3" plane through (0, 0, 0) normal (0, 0, -1) x (-1, 0, 0)
  circle A0 centre (-29.855669, -45.12143) radius 1.5
  circle A1 centre (-29.855669, 45.469872) radius 1.5
  circle A2 centre (30.010159, 45.469872) radius 1.5
  circle A3 centre (30.010159, -45.12143) radius 1.5
  point P0 (0, 0)
extrude "Wyciągnięcie proste3" cut sketch "Szkic3" against normal through all
properties part number "płyta_pod_lipol"
